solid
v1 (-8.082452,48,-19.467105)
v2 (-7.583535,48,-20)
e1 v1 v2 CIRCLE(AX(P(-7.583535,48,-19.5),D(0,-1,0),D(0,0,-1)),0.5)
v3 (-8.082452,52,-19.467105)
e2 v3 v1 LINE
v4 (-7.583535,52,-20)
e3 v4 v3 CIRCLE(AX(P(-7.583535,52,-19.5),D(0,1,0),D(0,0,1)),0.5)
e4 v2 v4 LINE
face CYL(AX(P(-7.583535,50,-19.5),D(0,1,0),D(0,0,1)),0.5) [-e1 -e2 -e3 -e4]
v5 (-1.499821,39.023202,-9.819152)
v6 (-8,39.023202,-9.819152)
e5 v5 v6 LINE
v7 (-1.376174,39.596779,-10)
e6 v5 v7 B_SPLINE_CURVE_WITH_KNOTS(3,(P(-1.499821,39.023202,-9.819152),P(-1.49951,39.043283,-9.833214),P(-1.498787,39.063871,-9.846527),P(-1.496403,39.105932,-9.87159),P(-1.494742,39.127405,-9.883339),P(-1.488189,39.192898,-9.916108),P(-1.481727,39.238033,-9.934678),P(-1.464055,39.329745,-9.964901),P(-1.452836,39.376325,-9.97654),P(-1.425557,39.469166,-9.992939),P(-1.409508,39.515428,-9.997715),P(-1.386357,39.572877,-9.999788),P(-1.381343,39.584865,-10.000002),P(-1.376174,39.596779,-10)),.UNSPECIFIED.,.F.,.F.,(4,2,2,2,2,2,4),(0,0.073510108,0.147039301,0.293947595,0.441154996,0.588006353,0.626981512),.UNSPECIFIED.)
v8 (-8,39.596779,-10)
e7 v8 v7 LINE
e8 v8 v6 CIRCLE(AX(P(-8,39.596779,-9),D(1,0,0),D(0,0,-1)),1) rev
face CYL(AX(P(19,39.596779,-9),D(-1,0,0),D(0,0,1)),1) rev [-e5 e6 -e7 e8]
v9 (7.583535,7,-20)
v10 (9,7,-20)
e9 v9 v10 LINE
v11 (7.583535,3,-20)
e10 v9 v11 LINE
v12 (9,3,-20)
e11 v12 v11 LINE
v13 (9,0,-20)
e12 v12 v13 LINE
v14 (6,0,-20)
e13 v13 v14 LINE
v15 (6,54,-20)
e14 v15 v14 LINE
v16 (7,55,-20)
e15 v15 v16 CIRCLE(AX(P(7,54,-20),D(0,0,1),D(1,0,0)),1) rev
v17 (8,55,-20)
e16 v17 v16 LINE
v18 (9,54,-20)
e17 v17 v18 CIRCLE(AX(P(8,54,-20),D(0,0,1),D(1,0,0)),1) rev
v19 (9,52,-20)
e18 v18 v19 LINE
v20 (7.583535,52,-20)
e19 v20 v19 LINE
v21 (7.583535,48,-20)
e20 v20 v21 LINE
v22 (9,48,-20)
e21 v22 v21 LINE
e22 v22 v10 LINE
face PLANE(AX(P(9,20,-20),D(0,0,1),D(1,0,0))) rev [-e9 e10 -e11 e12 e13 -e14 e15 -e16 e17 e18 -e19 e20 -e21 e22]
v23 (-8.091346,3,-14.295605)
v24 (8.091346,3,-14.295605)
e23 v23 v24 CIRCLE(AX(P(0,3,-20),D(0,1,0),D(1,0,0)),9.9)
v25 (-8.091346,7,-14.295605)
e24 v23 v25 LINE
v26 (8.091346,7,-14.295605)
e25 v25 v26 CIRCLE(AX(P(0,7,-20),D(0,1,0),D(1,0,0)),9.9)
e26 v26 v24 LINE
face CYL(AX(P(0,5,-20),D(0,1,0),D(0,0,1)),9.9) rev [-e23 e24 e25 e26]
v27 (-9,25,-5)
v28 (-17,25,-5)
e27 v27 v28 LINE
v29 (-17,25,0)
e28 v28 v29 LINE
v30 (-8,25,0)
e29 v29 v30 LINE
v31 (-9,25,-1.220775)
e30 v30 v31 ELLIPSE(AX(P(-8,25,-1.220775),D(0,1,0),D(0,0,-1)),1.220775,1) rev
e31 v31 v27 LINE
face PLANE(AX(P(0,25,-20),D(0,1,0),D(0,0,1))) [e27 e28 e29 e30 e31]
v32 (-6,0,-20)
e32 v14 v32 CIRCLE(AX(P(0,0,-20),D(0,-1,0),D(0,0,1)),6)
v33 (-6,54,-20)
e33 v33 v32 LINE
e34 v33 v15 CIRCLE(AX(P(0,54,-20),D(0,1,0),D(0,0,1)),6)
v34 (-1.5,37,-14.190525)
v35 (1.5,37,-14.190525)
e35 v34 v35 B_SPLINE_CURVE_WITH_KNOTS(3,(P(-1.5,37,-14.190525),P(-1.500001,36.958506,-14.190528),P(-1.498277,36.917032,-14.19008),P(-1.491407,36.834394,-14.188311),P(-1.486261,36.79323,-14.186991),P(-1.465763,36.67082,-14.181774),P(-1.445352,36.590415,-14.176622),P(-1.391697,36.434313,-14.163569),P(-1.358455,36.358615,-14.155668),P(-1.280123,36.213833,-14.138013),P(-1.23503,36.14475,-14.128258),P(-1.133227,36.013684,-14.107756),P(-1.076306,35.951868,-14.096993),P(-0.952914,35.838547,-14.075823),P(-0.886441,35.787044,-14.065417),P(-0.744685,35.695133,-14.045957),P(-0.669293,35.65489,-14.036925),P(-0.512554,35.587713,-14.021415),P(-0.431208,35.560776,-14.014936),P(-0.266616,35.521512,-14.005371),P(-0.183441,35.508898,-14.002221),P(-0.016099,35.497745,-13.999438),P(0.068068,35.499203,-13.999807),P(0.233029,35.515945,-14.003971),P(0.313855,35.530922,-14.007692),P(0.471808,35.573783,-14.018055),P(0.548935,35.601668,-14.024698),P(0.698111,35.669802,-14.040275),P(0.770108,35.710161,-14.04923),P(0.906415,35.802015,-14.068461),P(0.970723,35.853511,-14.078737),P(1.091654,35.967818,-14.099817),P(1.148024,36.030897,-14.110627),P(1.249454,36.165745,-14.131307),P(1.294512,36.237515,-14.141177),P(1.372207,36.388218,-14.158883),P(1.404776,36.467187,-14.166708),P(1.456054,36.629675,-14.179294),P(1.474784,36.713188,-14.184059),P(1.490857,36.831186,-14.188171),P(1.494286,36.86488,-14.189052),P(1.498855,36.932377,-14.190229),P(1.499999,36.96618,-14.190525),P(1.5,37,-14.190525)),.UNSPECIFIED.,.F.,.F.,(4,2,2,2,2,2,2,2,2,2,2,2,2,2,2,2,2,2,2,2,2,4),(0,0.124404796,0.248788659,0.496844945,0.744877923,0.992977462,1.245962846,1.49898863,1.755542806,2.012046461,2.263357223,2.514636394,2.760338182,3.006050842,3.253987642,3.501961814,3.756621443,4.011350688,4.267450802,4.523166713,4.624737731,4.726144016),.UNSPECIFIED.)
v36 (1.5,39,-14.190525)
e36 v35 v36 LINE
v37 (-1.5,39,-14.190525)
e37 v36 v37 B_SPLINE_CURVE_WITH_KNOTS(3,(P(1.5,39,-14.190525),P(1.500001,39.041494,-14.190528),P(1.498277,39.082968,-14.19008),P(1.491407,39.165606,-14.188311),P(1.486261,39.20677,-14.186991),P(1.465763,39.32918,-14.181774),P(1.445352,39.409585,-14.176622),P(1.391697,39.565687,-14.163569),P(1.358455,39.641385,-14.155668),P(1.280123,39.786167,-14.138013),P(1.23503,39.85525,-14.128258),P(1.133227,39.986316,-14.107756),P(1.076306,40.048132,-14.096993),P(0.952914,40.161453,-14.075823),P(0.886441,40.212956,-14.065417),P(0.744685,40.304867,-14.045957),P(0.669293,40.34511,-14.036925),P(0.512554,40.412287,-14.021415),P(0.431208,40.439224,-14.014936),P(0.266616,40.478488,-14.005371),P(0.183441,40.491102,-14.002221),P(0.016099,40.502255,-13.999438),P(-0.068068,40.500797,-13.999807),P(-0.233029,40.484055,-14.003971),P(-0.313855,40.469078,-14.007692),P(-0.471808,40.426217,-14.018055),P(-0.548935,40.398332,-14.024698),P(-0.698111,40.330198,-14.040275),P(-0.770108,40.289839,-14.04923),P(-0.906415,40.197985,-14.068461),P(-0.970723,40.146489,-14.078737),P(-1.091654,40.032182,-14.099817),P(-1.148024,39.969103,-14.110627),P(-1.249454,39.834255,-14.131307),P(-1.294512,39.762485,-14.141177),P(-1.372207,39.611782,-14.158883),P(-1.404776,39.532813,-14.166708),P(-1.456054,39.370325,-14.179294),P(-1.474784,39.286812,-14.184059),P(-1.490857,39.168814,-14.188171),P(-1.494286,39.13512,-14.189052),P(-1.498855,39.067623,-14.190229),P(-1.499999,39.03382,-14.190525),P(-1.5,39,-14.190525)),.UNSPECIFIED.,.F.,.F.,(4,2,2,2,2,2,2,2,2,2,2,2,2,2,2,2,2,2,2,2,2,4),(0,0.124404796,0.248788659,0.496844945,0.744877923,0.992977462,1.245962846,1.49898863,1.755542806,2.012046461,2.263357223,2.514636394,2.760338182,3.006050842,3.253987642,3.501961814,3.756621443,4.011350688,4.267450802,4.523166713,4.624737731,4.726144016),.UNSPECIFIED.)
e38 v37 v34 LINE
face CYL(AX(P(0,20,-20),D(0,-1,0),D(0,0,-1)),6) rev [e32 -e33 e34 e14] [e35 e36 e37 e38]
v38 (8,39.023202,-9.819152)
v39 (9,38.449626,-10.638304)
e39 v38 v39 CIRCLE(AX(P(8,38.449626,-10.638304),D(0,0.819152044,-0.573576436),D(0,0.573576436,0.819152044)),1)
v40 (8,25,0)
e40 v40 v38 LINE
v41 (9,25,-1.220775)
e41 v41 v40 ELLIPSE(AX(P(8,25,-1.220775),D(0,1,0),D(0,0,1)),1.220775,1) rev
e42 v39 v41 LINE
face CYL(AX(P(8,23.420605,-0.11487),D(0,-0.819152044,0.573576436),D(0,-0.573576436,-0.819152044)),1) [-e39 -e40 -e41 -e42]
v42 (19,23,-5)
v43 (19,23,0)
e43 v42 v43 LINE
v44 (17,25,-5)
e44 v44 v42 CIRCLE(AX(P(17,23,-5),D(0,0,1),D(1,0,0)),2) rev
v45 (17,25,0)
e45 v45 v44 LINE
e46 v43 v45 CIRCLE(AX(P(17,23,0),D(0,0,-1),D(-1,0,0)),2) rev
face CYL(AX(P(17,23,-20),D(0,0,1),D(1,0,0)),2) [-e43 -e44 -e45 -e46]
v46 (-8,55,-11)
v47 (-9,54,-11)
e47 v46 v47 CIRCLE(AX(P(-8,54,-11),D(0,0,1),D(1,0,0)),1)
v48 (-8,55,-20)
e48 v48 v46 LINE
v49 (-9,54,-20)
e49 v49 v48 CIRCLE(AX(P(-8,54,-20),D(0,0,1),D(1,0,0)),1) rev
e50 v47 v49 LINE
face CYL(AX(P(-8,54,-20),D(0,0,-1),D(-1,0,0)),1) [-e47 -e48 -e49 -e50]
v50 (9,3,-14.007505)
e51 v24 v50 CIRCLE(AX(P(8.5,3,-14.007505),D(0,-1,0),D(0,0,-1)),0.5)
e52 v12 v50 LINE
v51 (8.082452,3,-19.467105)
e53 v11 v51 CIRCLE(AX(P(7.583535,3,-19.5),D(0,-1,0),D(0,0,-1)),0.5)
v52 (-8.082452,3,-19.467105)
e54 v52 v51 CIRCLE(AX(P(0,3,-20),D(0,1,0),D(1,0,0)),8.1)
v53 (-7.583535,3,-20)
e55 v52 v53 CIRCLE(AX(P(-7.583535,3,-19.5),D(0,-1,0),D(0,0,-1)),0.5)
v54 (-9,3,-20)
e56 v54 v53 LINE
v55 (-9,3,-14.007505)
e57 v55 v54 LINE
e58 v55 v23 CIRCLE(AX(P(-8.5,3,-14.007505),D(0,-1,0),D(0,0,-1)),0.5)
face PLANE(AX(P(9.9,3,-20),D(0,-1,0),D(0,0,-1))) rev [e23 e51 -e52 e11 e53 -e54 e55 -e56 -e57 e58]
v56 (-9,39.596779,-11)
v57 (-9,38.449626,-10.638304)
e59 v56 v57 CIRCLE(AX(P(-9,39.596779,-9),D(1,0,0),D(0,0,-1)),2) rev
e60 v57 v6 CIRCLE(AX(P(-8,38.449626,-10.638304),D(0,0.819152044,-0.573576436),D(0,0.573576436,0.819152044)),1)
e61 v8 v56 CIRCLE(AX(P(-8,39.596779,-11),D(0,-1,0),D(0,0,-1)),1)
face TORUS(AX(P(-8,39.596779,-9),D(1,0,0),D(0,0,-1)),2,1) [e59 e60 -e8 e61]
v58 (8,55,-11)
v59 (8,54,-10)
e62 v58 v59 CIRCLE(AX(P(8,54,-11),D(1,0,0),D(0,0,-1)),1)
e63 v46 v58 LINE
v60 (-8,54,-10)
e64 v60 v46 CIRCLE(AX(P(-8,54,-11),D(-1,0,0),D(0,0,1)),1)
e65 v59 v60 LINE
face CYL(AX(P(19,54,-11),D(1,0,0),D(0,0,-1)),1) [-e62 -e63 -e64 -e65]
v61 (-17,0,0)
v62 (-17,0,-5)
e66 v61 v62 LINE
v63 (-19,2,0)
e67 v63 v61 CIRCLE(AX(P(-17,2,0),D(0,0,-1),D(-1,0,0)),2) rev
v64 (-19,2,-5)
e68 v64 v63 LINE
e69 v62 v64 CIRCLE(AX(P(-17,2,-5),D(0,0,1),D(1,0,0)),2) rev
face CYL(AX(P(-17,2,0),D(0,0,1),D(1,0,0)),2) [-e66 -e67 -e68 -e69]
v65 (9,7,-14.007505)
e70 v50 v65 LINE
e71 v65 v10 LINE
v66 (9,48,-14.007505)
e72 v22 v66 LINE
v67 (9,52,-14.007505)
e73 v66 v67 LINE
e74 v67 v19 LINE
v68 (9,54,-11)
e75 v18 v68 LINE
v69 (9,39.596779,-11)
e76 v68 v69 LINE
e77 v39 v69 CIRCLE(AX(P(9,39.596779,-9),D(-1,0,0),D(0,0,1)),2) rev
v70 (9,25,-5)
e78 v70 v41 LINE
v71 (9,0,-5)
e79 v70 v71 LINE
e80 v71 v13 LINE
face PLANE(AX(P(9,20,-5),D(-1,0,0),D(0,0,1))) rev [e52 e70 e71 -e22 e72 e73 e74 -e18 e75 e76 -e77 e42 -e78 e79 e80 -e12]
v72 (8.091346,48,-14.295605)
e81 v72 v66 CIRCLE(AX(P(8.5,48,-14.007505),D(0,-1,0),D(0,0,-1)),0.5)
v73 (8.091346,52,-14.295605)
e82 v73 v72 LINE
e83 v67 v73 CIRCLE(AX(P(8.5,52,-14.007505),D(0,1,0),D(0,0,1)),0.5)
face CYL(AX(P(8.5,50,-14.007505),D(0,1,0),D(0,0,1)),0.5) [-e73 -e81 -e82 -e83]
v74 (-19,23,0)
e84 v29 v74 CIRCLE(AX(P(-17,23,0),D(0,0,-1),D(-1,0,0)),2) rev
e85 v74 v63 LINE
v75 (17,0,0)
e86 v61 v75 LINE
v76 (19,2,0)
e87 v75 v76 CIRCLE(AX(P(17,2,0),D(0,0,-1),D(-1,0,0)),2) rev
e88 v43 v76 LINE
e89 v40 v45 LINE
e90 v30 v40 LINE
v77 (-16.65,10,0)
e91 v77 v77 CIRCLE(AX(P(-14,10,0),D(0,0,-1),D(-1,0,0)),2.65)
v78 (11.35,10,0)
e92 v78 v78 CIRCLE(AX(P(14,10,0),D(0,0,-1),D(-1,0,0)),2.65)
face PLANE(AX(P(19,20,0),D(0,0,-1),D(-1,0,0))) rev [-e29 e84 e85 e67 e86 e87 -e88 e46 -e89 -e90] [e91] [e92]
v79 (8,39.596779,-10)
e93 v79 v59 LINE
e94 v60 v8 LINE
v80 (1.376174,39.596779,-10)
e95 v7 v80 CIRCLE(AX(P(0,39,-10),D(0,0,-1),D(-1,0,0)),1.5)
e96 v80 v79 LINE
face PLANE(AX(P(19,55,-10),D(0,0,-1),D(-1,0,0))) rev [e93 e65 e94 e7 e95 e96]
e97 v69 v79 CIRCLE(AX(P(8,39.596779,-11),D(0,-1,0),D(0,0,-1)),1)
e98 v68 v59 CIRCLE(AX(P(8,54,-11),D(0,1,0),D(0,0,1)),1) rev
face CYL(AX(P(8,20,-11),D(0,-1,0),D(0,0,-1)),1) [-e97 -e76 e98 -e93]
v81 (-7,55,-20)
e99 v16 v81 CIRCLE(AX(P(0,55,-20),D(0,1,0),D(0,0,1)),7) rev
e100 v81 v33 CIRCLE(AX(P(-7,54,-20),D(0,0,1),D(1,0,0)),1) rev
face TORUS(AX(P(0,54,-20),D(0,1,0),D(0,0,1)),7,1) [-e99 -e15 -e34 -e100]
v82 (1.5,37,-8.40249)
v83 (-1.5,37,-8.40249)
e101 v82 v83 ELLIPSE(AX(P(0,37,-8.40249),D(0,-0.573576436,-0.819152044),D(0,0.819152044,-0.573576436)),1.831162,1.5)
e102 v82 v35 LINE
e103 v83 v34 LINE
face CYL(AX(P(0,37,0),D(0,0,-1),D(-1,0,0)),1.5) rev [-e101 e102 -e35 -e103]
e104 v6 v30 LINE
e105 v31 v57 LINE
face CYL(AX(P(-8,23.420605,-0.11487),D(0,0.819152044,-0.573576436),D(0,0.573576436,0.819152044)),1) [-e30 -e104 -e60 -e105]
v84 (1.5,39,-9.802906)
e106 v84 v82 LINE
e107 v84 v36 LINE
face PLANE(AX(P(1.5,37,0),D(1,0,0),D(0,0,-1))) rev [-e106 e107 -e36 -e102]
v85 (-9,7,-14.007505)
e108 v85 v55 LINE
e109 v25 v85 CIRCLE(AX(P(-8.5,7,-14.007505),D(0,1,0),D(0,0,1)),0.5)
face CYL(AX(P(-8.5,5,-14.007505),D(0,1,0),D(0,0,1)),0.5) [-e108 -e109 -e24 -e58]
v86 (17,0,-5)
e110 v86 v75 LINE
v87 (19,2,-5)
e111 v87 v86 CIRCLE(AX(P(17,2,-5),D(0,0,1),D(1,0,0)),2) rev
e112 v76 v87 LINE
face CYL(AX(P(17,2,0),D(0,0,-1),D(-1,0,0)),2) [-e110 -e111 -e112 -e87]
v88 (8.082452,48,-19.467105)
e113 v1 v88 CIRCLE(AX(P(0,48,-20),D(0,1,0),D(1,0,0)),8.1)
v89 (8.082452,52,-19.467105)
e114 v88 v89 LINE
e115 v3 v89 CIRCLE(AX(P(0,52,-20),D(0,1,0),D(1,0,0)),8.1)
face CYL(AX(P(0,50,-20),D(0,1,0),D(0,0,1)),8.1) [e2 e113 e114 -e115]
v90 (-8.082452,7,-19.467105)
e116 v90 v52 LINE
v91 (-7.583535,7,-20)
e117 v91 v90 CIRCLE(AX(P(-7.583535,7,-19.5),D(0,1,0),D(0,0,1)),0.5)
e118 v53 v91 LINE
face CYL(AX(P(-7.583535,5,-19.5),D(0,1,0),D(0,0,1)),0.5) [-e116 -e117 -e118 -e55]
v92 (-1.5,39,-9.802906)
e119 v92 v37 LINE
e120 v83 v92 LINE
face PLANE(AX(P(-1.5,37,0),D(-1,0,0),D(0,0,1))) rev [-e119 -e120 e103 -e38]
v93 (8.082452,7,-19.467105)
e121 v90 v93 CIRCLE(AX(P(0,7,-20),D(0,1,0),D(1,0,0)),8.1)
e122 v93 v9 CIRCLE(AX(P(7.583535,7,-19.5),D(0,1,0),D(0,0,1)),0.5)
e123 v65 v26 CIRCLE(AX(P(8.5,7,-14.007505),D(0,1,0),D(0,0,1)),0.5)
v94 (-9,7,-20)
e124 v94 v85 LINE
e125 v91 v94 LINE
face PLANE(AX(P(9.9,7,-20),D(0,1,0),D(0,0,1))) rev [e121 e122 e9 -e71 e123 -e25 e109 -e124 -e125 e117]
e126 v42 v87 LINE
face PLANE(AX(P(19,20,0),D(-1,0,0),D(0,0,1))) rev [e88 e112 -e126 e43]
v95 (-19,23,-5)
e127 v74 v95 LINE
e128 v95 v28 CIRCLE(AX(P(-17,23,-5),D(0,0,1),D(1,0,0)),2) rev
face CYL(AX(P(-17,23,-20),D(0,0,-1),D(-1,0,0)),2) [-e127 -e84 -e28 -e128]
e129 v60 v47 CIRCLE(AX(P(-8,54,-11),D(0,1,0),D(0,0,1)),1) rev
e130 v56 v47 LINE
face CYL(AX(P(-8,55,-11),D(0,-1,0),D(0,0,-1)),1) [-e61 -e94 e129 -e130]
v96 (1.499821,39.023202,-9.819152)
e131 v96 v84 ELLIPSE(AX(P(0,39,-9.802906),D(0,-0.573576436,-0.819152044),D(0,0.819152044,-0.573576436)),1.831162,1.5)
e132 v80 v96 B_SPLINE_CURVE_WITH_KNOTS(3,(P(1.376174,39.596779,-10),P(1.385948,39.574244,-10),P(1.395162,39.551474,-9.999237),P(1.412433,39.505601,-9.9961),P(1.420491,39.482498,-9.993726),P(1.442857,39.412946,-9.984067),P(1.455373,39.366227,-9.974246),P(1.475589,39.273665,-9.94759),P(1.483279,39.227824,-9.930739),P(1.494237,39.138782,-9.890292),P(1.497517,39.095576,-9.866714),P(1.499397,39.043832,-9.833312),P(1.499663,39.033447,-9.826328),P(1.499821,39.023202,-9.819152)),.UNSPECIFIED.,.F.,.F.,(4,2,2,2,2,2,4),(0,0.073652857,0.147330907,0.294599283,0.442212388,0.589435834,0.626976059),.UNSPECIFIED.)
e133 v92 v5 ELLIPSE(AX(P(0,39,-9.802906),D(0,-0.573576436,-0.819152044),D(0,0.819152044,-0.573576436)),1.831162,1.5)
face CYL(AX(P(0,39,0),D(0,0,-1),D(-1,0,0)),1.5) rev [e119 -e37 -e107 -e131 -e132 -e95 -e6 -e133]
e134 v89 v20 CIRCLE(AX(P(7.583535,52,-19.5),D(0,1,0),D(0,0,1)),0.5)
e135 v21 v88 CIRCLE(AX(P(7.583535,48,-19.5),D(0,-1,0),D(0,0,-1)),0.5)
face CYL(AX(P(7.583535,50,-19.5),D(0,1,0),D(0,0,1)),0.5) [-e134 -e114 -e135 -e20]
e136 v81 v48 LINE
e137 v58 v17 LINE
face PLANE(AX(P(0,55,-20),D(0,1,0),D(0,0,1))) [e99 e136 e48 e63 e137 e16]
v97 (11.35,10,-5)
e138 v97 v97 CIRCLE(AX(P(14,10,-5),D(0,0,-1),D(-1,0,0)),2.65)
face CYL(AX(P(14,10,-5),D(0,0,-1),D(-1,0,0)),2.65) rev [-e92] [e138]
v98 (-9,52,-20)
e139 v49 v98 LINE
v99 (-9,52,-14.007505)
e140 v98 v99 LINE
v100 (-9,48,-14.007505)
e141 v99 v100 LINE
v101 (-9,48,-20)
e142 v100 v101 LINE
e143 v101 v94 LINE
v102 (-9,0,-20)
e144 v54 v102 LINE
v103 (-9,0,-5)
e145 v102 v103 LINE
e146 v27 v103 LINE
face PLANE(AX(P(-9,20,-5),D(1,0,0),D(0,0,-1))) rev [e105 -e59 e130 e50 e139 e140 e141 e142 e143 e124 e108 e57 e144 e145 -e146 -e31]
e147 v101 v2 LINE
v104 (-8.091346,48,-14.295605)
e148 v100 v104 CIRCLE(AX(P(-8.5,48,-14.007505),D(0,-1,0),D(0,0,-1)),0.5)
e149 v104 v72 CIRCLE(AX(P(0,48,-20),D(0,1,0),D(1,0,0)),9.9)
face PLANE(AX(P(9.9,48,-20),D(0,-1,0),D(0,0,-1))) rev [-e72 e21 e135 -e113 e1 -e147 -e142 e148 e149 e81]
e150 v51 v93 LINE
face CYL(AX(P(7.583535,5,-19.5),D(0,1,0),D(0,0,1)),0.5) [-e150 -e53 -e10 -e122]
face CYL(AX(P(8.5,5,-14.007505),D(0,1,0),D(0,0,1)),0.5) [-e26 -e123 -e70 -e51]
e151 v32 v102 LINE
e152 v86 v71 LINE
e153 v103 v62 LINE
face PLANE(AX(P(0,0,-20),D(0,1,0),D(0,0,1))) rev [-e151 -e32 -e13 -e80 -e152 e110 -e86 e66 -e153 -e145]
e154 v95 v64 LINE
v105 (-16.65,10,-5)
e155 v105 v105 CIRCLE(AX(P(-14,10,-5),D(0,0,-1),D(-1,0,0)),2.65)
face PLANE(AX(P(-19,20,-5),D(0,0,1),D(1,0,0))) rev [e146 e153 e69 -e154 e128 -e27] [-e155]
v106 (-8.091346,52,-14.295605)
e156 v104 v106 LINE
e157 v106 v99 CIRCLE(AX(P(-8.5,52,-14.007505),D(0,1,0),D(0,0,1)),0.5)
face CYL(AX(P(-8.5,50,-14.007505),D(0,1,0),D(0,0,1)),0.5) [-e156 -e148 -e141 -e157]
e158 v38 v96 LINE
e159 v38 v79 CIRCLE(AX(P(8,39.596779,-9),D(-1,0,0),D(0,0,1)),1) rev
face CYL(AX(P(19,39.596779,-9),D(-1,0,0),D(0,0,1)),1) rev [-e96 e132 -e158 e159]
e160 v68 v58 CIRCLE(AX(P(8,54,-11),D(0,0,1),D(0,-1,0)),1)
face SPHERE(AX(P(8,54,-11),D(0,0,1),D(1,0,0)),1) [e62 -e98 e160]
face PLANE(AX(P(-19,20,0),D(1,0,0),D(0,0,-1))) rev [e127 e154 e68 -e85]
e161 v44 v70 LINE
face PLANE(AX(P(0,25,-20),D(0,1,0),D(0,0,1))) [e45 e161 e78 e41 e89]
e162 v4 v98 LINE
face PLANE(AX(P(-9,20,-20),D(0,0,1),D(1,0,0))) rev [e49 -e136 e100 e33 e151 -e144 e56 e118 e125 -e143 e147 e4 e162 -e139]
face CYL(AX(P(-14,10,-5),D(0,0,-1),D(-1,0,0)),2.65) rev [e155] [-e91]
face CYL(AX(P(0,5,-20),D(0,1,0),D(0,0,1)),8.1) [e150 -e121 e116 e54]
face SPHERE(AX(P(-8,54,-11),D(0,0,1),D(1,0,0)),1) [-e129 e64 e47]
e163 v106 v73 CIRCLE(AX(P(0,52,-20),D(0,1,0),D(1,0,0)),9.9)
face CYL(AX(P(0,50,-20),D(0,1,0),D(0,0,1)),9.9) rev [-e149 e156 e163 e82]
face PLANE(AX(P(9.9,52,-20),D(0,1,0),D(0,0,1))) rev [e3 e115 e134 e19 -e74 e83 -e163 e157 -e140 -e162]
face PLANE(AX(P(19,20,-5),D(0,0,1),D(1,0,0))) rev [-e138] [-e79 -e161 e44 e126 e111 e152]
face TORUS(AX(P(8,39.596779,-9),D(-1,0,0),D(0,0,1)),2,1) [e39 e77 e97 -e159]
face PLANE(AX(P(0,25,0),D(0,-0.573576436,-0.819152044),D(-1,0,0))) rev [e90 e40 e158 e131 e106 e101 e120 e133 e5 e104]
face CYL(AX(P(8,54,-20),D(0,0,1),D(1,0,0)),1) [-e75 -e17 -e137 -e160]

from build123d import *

# Parameters (mm, degrees)
BOSS_EXTRUDE1_DEPTH  = 20
M5_CLEARANCE_HOLE1_D = 5.3
SKETCH11_W           = 1.8
SKETCH11_H           = 4
FILLET2_START        = 3
FILLET2_DEPTH        = 4
MOVE_FACE1_BY        = 5
BOSS_EXTRUDE2_DEPTH  = 30
FILLET1_R            = 2
SKETCH13_W           = 10
SKETCH13_H           = 30
CUT_EXTRUDE1_DEPTH   = 65.876806449
CHAMFER3_SIZE        = 14.281480067
CHAMFER3_SIZE_2      = 10
FILLET3_R            = 1
CUT_EXTRUDE2_DEPTH   = 62.530480341


with BuildPart() as part:
    # Sketch4 → Boss-Extrude1 (new body)
    with BuildSketch(Plane(origin=(0, 0, 0), x_dir=(1, 0, 0), z_dir=(0, 1, 0))):
        with BuildLine():
            Line((19, 0), (-19, 0))
            Line((-19, 0), (-19, 5))
            Line((-19, 5), (-9, 5))
            Line((-9, 5), (-9, 20))
            Line((-9, 20), (-6, 20))
            ThreePointArc((-6, 20), (0, 14), (6, 20))
            Line((6, 20), (9, 20))
            Line((9, 20), (9, 5))
            Line((9, 5), (19, 5))
            Line((19, 5), (19, 0))
        make_face()
    extrude(amount=BOSS_EXTRUDE1_DEPTH)

    # M5 Clearance Hole1 (through all)
    with Locations(Plane(origin=(0, 0, -5), x_dir=(-1, 0, 0), z_dir=(0, 0, -1))):
        with Locations((-14, 10), (14, 10)):
            Hole(M5_CLEARANCE_HOLE1_D / 2)

    # Cut-Sweep1: sweep along a path in Sketch10
    with BuildLine(Plane(origin=(0, 5, 0), x_dir=(1, 0, 0), z_dir=(0, 1, 0))) as cut_sweep1_path:
        CenterArc((0, 20), 6, 0, 360)
    # Sketch11 → Cut-Sweep1 (sweep, cut)
    with BuildSketch(Plane(origin=(0, 0, -20), x_dir=(-1, 0, 0), z_dir=(0, 0, -1))):
        with Locations((-9, 5)):
            Rectangle(SKETCH11_W, SKETCH11_H)
    cut_sweep1 = sweep(path=cut_sweep1_path.line, mode=Mode.SUBTRACT)

    # Fillet2: read off the stored shape, not the designer's step
    # Fillet2 outline → Fillet2 (cut)
    with BuildSketch(Plane(origin=(0, 0, 0), x_dir=(1, 0, 0), z_dir=(0, 1, 0)).offset(FILLET2_START)):
        with BuildLine():
            ThreePointArc((7.583534796, 20), (7.948532993, 19.841725498), (8.082451559, 19.467105263))
            ThreePointArc((8.082451559, 19.467105263), (8.095611701, 19.733408201), (8.1, 20))
            Line((8.1, 20), (7.583534796, 20))
        make_face()
        with BuildLine():
            ThreePointArc((-8.1, 20), (-8.095611701, 19.733408201), (-8.082451559, 19.467105263))
            ThreePointArc((-8.082451559, 19.467105263), (-7.948532993, 19.841725498), (-7.583534796, 20))
            Line((-7.583534796, 20), (-8.1, 20))
        make_face()
        with BuildLine():
            Line((9, 14.007504693), (9, 15.875681875))
            ThreePointArc((9, 15.875681875), (8.582114467, 15.064687318), (8.091346154, 14.295605429))
            ThreePointArc((8.091346154, 14.295605429), (8.651117631, 14.484121375), (9, 14.007504693))
        make_face()
        with BuildLine():
            ThreePointArc((-8.091346154, 14.295605429), (-8.582114467, 15.064687318), (-9, 15.875681875))
            Line((-9, 15.875681875), (-9, 14.007504693))
            ThreePointArc((-9, 14.007504693), (-8.651117631, 14.484121375), (-8.091346154, 14.295605429))
        make_face()
    fillet2 = extrude(amount=FILLET2_DEPTH, mode=Mode.SUBTRACT)

    # Move Face1: a face moved outward by 5.0
    extrude(part.faces().sort_by_distance((0, 20, -7.09633707))[0], amount=MOVE_FACE1_BY, dir=(0, 1, 0))

    # Sketch12 → Boss-Extrude2 (add)
    with BuildSketch(Plane(origin=(0, 25, 0), x_dir=(1, 0, 0), z_dir=(0, 1, 0))):
        with BuildLine():
            Line((-9, 5), (-9, 0))
            Line((-9, 0), (9, 0))
            Line((9, 0), (9, 5))
            Line((9, 5), (9, 20))
            Line((9, 20), (6, 20))
            ThreePointArc((6, 20), (0, 14), (-6, 20))
            Line((-6, 20), (-9, 20))
            Line((-9, 20), (-9, 5))
        make_face()
    extrude(amount=BOSS_EXTRUDE2_DEPTH)

    # Fillet1
    fillet1_edges = [part.edges().sort_by_distance(p)[0] for p in [
        (19, 25, -2.5),
        (19, 0, -2.5),
        (-19, 0, -2.5),
        (-19, 25, -2.5),
    ]]
    fillet(fillet1_edges, radius=FILLET1_R)

    # Sketch13 → Cut-Extrude1 (cut, through all)
    with BuildSketch(Plane.ZY.offset(9)):
        with Locations((-5, 40)):
            Rectangle(SKETCH13_W, SKETCH13_H)
    extrude(amount=-CUT_EXTRUDE1_DEPTH, mode=Mode.SUBTRACT)

    # Chamfer3
    # the kernel refuses this chamfer: 14.281480067, 10 mm, written as the material it adds along each edge
    with BuildSketch(Plane(origin=(-9, 25, -10), x_dir=(0, 1, 0), z_dir=(1, 0, 0))) as chamfer3_piece_1_section:
        Polygon((CHAMFER3_SIZE, 0), (0, CHAMFER3_SIZE_2), (0, 0), align=None)
    chamfer3_piece_1 = extrude(amount=18, mode=Mode.PRIVATE)
    chamfer3_piece_1 = split(chamfer3_piece_1, bisect_by=Plane(origin=(-9, 25, 0), z_dir=(0, 0, -1)), keep=Keep.TOP, mode=Mode.PRIVATE)
    add(chamfer3_piece_1)

    # Fillet3
    fillet3_edges = [part.edges().sort_by_distance(p)[0] for p in [
        (0, 55, -14),
        (-9, 55, -15),
        (9, 55, -15),
        (0, 55, -10),
        (9, 47.140740034, -10),
        (-9, 47.140740034, -10),
        (0, 39.281480067, -10),
        (-9, 32.140740034, -5),
        (9, 32.140740034, -5),
    ]]
    fillet(fillet3_edges, radius=FILLET3_R)

    # Mirror1: Cut-Sweep1, Fillet2 across plane
    add(cut_sweep1.mirror(Plane.ZX.offset(27.5)), mode=Mode.SUBTRACT)
    add(fillet2.mirror(Plane.ZX.offset(27.5)), mode=Mode.SUBTRACT)

    # Sketch14 → Cut-Extrude2 (cut, through all)
    with BuildSketch(Plane(origin=(0, 0, -20), x_dir=(-1, 0, 0), z_dir=(0, 0, -1))):
        with BuildLine():
            Line((-1.5, 37), (-1.5, 39))
            ThreePointArc((-1.5, 39), (0, 40.5), (1.5, 39))
            Line((1.5, 39), (1.5, 37))
            ThreePointArc((1.5, 37), (0, 35.5), (-1.5, 37))
        make_face()
    extrude(amount=-CUT_EXTRUDE2_DEPTH, mode=Mode.SUBTRACT)


solid = part.part
